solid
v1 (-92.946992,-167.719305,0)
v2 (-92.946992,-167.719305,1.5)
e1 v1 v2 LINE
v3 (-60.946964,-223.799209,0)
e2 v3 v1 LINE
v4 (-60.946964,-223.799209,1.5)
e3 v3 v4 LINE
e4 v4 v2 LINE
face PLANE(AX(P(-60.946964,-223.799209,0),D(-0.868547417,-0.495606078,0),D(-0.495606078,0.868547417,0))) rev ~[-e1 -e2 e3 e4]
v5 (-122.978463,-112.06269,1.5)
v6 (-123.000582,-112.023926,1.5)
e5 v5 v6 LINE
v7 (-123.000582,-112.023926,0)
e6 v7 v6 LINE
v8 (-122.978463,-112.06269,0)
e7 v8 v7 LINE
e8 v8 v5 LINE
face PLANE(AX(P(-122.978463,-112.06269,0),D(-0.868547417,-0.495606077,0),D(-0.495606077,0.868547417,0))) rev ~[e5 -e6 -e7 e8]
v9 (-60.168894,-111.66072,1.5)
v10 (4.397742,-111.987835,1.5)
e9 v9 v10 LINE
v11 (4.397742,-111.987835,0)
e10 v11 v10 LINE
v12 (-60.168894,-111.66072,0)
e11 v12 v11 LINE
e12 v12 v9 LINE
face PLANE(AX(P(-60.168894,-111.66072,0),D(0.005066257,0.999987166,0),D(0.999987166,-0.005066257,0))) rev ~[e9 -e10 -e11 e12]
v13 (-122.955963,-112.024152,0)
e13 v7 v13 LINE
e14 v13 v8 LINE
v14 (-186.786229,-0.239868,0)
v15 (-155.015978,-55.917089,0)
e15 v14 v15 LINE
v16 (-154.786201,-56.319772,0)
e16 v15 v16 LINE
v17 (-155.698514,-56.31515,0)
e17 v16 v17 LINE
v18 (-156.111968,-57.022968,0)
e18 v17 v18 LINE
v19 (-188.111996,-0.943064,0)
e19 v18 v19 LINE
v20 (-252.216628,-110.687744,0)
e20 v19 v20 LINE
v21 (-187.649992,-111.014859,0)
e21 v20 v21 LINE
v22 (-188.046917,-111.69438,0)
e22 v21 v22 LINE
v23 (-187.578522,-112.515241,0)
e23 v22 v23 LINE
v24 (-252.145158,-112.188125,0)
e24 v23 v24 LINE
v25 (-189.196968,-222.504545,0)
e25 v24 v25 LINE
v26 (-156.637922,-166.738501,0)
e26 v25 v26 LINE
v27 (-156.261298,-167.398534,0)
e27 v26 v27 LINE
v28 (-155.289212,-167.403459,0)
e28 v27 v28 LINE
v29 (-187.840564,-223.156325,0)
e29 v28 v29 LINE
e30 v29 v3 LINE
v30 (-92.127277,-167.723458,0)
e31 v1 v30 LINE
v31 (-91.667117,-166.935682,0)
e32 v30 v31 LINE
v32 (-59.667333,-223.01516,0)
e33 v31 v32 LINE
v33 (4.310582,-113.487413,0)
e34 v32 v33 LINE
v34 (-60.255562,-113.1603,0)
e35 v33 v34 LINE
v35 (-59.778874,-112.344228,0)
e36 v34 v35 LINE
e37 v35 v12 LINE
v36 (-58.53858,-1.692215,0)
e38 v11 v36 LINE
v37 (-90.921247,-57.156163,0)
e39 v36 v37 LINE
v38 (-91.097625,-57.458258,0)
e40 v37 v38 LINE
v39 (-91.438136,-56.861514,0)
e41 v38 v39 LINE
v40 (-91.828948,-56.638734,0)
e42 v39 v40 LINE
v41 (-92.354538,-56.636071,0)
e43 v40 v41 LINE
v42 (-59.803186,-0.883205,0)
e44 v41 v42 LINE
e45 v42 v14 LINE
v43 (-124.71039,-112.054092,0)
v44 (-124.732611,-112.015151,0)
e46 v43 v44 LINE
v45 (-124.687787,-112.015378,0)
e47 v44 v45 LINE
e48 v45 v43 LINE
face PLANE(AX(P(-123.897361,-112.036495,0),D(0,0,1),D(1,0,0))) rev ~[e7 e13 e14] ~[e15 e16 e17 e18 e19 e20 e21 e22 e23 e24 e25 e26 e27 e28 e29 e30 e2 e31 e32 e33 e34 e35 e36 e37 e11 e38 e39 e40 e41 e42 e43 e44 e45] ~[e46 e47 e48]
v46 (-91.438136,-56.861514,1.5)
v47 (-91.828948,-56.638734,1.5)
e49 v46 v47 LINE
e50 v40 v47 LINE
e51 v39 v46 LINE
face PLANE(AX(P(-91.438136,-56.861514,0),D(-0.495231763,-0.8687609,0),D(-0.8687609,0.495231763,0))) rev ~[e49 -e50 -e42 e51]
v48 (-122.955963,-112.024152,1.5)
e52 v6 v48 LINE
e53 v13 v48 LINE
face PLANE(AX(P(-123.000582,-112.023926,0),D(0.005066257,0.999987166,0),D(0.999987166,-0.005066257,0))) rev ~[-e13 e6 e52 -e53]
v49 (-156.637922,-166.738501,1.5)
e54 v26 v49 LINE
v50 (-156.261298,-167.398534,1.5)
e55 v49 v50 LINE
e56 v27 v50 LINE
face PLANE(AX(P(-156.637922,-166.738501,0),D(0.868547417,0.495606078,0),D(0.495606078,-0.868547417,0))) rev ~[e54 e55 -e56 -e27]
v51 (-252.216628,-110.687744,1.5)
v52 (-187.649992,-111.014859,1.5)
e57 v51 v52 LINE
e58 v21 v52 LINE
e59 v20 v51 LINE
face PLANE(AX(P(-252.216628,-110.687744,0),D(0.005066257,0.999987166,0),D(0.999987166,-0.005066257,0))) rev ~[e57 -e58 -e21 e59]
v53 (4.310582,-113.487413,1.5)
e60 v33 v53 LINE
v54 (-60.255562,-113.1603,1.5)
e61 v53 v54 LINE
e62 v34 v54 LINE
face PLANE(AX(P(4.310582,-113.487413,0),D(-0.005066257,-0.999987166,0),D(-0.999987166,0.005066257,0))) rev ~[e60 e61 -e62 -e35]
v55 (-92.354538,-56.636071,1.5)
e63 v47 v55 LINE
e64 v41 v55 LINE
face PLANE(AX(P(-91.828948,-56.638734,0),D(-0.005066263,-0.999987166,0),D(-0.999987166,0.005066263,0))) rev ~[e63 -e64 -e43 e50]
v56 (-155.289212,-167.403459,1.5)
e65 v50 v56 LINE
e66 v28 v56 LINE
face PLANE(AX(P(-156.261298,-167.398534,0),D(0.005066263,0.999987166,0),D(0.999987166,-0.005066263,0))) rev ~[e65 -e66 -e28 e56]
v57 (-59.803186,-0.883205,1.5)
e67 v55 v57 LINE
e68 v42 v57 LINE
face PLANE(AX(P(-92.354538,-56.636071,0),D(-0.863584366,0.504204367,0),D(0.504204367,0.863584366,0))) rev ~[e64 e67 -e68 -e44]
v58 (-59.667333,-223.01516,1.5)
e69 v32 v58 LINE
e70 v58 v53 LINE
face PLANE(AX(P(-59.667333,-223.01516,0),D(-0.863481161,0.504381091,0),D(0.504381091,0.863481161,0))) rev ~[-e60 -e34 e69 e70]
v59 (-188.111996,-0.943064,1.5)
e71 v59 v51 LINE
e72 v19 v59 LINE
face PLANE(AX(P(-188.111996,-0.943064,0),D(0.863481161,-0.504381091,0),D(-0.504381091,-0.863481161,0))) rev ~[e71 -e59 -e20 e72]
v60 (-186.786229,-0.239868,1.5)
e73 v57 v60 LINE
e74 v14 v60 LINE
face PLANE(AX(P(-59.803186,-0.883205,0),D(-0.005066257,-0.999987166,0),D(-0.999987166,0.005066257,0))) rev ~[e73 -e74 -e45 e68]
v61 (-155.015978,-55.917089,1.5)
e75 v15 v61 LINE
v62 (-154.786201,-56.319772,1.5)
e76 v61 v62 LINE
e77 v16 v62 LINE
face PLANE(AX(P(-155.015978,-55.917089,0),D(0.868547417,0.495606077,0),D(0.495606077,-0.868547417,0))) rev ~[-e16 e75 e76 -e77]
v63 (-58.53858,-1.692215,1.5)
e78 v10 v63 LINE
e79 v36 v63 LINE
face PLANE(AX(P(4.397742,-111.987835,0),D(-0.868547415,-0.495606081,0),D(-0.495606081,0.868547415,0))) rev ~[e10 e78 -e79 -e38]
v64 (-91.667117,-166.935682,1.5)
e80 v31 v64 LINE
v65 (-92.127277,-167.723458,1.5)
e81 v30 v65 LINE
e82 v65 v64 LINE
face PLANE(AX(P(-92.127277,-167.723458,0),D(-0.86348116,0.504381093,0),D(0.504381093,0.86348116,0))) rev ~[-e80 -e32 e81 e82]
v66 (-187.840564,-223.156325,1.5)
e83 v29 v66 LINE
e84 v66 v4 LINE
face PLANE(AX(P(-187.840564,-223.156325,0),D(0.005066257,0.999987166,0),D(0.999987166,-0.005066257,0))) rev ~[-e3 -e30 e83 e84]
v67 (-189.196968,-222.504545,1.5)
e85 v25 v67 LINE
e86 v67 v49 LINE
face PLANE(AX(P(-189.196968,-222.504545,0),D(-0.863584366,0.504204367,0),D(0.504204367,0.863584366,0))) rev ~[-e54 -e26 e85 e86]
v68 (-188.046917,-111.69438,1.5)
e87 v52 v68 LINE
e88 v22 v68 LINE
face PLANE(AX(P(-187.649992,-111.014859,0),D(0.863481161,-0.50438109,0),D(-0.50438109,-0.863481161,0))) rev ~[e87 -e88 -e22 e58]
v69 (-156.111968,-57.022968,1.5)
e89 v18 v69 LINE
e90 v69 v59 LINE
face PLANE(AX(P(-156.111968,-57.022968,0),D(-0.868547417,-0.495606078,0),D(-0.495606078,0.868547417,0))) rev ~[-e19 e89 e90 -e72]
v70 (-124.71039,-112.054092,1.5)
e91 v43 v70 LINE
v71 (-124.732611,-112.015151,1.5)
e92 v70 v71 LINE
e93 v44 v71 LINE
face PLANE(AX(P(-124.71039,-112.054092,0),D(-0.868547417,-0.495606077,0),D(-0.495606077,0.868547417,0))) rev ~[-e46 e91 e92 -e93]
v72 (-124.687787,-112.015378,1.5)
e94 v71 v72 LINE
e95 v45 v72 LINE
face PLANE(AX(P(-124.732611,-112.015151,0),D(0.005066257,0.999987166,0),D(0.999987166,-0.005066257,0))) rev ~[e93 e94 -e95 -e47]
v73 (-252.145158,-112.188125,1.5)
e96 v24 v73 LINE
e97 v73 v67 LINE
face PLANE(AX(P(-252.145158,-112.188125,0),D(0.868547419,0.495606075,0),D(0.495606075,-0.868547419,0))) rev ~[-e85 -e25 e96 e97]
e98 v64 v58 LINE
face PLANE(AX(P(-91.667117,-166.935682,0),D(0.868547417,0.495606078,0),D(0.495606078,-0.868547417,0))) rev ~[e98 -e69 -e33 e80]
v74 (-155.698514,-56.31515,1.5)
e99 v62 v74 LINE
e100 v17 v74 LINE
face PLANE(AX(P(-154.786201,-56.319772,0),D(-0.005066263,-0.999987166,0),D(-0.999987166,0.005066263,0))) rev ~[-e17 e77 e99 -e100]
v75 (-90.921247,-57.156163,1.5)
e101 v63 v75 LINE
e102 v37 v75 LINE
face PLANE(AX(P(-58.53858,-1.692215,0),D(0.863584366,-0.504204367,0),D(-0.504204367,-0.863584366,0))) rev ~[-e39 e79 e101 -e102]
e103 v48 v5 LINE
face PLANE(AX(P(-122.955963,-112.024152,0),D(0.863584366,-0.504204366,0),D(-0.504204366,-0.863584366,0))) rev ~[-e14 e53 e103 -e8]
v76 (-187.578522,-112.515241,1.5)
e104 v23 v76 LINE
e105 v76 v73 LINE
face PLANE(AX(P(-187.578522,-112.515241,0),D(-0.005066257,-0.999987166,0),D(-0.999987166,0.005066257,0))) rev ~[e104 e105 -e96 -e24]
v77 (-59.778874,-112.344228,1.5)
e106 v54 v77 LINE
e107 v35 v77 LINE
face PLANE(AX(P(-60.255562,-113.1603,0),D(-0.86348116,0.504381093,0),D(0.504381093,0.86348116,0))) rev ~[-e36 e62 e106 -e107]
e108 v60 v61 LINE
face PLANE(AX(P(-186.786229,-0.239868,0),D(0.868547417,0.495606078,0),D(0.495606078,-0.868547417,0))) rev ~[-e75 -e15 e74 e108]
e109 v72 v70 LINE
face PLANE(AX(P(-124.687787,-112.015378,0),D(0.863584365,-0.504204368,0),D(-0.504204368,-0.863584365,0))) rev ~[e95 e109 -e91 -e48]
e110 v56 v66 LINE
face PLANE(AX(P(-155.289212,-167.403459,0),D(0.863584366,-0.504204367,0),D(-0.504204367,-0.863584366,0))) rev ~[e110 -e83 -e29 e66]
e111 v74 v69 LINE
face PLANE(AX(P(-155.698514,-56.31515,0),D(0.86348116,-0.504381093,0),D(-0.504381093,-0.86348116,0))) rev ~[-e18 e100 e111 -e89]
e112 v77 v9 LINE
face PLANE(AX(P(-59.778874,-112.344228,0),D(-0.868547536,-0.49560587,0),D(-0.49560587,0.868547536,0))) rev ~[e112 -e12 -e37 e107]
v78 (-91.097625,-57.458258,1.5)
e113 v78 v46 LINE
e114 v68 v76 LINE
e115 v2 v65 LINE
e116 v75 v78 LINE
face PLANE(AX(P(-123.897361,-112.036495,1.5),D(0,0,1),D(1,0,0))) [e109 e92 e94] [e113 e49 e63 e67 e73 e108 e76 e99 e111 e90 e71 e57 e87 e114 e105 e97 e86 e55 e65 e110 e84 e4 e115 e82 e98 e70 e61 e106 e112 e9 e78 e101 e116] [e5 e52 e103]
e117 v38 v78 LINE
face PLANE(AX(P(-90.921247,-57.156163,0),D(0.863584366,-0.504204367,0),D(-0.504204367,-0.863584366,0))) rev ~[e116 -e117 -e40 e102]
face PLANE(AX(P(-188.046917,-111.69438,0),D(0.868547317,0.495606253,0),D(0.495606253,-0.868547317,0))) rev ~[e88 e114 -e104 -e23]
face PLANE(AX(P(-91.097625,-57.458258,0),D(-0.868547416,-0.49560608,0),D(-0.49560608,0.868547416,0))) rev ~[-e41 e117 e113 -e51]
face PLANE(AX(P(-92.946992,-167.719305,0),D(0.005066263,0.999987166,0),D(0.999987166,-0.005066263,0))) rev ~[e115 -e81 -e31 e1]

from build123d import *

# Parameters (mm, degrees)
F1_DEPTH = 1.5


# Not quite as in the source:
# - ends of sketch curves that miss each other by under 0.0002 mm in the source are joined


with BuildPart() as f1:
    # F0 (on Top) → F1 (new body)
    with BuildSketch(Plane.XY):
        Polygon((-154.7862010079, -56.3197720771), (-155.698514, -56.31515), (-156.1119683507, -57.0229680515), (-188.1119961072, -0.943063637), (-252.2166275849, -110.6877438524), (-187.6499915883, -111.0148592346), (-188.0469170019, -111.6943803821), (-187.578521744, -112.5152405744), (-252.1451579752, -112.188125191), (-189.1969680657, -222.5045451407), (-156.6379224358, -166.7385013741), (-156.261298, -167.398534), (-155.2892116972, -167.4034589083), (-187.8405636484, -223.1563251995), (-60.9469641109, -223.7992090591), (-92.9469916323, -167.7193050566), (-92.127277, -167.723458), (-91.6671171884, -166.9356819838), (-59.667332984, -223.0151595742), (4.3105823215, -113.4874126049), (-60.2555620411, -113.1602997135), (-59.778874, -112.344228), (-60.1688938721, -111.6607195518), (4.3977421328, -111.987834934), (-58.5385800691, -1.6922148149), (-90.9212471101, -57.156163237), (-91.0976251965, -57.4582577209), (-91.4381361233, -56.861513861), (-91.8289476292, -56.638734186), (-92.3545377772, -56.6360713738), (-59.8031858283, -0.8832050865), (-186.7862285296, -0.239868074), (-155.0159777331, -55.9170894017), align=None)
        Polygon((-124.7326106109, -112.0151510591), (-124.6877867318, -112.0153781513), (-124.7103900886, -112.0540924243), align=None, mode=Mode.SUBTRACT)
        Polygon((-123.0005820296, -112.023926074), (-122.955962742, -112.0241521297), (-122.9784629293, -112.0626896976), align=None, mode=Mode.SUBTRACT)
    extrude(amount=F1_DEPTH)


solid = f1.part
